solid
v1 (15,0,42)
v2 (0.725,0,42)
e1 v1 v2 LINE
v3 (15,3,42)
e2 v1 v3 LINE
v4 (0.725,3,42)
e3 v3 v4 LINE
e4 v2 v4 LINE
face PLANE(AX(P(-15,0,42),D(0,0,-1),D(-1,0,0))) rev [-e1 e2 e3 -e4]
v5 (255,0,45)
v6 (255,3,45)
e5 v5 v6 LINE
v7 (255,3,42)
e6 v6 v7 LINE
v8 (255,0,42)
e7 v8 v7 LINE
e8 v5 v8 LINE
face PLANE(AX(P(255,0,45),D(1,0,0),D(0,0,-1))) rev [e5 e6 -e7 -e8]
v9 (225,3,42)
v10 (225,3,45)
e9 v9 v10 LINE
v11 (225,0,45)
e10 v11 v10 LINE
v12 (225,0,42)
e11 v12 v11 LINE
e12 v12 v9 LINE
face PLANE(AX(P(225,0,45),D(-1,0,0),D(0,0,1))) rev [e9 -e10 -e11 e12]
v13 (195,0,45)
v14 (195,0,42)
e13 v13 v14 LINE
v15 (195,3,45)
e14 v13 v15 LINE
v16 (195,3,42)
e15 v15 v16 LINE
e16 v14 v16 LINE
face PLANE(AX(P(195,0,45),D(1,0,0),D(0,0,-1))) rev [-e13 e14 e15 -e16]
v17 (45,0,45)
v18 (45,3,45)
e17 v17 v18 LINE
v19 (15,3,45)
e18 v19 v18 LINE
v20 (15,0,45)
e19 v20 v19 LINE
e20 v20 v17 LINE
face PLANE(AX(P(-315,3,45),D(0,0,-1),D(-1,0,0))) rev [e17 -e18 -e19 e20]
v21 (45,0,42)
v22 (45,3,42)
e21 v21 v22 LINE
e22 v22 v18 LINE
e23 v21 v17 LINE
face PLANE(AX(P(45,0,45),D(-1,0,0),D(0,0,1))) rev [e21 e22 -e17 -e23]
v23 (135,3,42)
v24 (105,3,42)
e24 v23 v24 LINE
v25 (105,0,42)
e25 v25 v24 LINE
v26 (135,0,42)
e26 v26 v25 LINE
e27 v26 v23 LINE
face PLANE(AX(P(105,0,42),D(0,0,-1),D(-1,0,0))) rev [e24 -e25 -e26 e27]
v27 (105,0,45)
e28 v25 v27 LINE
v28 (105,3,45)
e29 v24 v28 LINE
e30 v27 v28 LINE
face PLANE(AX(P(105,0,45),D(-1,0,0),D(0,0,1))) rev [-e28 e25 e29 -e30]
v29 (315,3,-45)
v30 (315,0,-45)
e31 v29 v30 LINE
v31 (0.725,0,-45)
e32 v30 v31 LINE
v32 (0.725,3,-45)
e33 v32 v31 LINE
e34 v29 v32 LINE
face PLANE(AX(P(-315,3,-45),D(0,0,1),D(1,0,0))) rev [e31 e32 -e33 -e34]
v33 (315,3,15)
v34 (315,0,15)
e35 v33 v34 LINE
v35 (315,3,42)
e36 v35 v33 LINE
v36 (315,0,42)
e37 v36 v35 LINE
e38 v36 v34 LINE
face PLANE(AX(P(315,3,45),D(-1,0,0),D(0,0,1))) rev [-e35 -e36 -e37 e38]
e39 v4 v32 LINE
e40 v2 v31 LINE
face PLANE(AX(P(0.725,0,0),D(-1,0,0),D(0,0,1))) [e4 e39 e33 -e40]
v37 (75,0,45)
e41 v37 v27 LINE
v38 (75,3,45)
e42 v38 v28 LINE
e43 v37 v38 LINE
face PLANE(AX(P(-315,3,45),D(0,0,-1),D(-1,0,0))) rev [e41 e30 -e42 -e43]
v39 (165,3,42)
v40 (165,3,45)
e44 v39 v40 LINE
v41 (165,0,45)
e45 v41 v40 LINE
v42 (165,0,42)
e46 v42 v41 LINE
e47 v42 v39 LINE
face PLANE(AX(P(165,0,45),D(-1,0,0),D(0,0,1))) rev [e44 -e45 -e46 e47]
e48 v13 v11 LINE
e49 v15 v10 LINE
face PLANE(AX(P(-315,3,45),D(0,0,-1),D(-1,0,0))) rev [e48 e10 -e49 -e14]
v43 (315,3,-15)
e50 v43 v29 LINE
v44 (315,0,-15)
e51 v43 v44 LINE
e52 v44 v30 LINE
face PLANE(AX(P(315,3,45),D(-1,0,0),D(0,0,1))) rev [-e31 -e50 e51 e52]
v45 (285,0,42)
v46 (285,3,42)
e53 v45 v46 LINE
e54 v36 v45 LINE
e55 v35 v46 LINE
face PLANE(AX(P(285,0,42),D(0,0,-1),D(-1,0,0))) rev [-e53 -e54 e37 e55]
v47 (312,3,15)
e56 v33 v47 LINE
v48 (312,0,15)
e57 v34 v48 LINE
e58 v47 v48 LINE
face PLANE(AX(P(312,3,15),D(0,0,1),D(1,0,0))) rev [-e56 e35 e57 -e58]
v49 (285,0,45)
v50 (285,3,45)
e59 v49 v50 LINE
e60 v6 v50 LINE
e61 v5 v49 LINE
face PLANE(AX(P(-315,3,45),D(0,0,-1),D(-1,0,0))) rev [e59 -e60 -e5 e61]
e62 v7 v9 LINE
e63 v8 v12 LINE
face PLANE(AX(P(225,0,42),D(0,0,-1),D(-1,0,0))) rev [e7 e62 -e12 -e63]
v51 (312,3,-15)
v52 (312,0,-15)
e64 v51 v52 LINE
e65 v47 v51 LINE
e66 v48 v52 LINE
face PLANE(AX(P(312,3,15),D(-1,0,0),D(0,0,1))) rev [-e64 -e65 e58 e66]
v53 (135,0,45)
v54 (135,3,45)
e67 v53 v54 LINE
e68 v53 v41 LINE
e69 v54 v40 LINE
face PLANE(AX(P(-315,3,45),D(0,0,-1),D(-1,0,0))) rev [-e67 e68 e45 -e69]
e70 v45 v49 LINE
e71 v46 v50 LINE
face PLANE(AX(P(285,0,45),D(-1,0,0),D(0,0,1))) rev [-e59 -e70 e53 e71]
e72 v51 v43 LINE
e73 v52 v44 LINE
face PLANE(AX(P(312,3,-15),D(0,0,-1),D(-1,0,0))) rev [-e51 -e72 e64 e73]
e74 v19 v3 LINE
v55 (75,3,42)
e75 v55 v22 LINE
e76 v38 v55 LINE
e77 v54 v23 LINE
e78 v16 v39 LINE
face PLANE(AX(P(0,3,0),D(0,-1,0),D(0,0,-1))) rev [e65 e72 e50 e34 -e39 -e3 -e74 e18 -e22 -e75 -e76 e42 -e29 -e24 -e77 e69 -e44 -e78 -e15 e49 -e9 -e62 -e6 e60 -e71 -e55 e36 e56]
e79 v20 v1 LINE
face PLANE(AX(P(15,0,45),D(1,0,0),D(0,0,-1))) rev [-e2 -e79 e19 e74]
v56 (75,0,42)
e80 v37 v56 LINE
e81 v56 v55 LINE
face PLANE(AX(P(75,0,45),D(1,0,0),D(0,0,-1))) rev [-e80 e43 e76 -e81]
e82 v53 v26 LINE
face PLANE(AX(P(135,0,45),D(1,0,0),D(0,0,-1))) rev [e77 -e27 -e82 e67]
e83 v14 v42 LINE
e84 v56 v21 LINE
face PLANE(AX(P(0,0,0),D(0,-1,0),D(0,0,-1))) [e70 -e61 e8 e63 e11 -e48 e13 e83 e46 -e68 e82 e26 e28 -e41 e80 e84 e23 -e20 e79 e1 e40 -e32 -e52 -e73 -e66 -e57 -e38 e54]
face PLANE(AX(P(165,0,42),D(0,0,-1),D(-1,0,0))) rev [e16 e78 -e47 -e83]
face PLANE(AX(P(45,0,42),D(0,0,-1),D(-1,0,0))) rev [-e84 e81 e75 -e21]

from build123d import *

# Parameters (mm, degrees)
SKETCH1_W              = 630
SKETCH1_H              = 90
BOSS_EXTRUDE1_DEPTH    = 3
SKETCH3_W              = 30
SKETCH3_H              = 3
CUT_EXTRUDE1_DEPTH     = 3
LPATTERN1_COUNT        = 10
LPATTERN1_PITCH        = 60
LPATTERN1_COL_COUNT    = 2
LPATTERN1_COL_PITCH    = 60
CUT_EXTRUDE5_START     = -3
CUT_EXTRUDE5_OUTLINE_W = 3
CUT_EXTRUDE5_OUTLINE_H = 30
CUT_EXTRUDE5_DEPTH     = 3
SKETCH7_W              = 3
SKETCH7_H              = 30
CUT_EXTRUDE3_DEPTH     = 3
SKETCH13_W             = 3
SKETCH13_H             = 27
CUT_EXTRUDE4_DEPTH     = 10


# Read off the part's stored shape, not the designer's step: Cut-Extrude5
with BuildPart() as part:
    # Sketch1 → Boss-Extrude1 (new body)
    with BuildSketch(Plane(origin=(0, 0, 0), x_dir=(1, 0, 0), z_dir=(0, 1, 0))):
        Rectangle(SKETCH1_W, SKETCH1_H)
    extrude(amount=BOSS_EXTRUDE1_DEPTH)

    # Sketch3 → Cut-Extrude1 (cut)
    with BuildSketch(Plane(origin=(0, 3, 0), x_dir=(1, 0, 0), z_dir=(0, 1, 0))):
        with Locations((-240, -43.5)):
            Rectangle(SKETCH3_W, SKETCH3_H)
    cut_extrude1 = extrude(amount=-CUT_EXTRUDE1_DEPTH, mode=Mode.SUBTRACT)

    # LPattern1: Cut-Extrude1 ×10
    with Locations(*[(i * LPATTERN1_PITCH, 0, 0) for i in range(1, LPATTERN1_COUNT)]):
        add(cut_extrude1, mode=Mode.SUBTRACT)

    # LPattern1 col: Cut-Extrude1 ×2
    with Locations(*[(-i * LPATTERN1_COL_PITCH, 0, 0) for i in range(1, LPATTERN1_COL_COUNT)]):
        add(cut_extrude1, mode=Mode.SUBTRACT)

    # Cut-Extrude5 outline → Cut-Extrude5 (cut)
    with BuildSketch(Plane(origin=(0, 3, 0), x_dir=(1, 0, 0), z_dir=(0, 1, 0)).offset(CUT_EXTRUDE5_START)):
        with Locations((313.5, 1e-09)):
            Rectangle(CUT_EXTRUDE5_OUTLINE_W, CUT_EXTRUDE5_OUTLINE_H)
    extrude(amount=CUT_EXTRUDE5_DEPTH, mode=Mode.SUBTRACT)

    # Sketch7 → Cut-Extrude3 (cut)
    with BuildSketch(Plane(origin=(0, 3, 0), x_dir=(1, 0, 0), z_dir=(0, 1, 0))):
        with Locations((-313.5, 30)):
            Rectangle(SKETCH7_W, SKETCH7_H)
    extrude(amount=-CUT_EXTRUDE3_DEPTH, mode=Mode.SUBTRACT)

    # Sketch13 → Cut-Extrude4 (cut)
    with BuildSketch(Plane(origin=(0, 3, 0), x_dir=(1, 0, 0), z_dir=(0, 1, 0))):
        with Locations((-313.5, -28.5)):
            Rectangle(SKETCH13_W, SKETCH13_H)
    extrude(amount=-CUT_EXTRUDE4_DEPTH, mode=Mode.SUBTRACT)

    # SurfaceCut1
    split(bisect_by=Plane.ZY.offset(-0.725), keep=Keep.BOTTOM)


solid = part.part
